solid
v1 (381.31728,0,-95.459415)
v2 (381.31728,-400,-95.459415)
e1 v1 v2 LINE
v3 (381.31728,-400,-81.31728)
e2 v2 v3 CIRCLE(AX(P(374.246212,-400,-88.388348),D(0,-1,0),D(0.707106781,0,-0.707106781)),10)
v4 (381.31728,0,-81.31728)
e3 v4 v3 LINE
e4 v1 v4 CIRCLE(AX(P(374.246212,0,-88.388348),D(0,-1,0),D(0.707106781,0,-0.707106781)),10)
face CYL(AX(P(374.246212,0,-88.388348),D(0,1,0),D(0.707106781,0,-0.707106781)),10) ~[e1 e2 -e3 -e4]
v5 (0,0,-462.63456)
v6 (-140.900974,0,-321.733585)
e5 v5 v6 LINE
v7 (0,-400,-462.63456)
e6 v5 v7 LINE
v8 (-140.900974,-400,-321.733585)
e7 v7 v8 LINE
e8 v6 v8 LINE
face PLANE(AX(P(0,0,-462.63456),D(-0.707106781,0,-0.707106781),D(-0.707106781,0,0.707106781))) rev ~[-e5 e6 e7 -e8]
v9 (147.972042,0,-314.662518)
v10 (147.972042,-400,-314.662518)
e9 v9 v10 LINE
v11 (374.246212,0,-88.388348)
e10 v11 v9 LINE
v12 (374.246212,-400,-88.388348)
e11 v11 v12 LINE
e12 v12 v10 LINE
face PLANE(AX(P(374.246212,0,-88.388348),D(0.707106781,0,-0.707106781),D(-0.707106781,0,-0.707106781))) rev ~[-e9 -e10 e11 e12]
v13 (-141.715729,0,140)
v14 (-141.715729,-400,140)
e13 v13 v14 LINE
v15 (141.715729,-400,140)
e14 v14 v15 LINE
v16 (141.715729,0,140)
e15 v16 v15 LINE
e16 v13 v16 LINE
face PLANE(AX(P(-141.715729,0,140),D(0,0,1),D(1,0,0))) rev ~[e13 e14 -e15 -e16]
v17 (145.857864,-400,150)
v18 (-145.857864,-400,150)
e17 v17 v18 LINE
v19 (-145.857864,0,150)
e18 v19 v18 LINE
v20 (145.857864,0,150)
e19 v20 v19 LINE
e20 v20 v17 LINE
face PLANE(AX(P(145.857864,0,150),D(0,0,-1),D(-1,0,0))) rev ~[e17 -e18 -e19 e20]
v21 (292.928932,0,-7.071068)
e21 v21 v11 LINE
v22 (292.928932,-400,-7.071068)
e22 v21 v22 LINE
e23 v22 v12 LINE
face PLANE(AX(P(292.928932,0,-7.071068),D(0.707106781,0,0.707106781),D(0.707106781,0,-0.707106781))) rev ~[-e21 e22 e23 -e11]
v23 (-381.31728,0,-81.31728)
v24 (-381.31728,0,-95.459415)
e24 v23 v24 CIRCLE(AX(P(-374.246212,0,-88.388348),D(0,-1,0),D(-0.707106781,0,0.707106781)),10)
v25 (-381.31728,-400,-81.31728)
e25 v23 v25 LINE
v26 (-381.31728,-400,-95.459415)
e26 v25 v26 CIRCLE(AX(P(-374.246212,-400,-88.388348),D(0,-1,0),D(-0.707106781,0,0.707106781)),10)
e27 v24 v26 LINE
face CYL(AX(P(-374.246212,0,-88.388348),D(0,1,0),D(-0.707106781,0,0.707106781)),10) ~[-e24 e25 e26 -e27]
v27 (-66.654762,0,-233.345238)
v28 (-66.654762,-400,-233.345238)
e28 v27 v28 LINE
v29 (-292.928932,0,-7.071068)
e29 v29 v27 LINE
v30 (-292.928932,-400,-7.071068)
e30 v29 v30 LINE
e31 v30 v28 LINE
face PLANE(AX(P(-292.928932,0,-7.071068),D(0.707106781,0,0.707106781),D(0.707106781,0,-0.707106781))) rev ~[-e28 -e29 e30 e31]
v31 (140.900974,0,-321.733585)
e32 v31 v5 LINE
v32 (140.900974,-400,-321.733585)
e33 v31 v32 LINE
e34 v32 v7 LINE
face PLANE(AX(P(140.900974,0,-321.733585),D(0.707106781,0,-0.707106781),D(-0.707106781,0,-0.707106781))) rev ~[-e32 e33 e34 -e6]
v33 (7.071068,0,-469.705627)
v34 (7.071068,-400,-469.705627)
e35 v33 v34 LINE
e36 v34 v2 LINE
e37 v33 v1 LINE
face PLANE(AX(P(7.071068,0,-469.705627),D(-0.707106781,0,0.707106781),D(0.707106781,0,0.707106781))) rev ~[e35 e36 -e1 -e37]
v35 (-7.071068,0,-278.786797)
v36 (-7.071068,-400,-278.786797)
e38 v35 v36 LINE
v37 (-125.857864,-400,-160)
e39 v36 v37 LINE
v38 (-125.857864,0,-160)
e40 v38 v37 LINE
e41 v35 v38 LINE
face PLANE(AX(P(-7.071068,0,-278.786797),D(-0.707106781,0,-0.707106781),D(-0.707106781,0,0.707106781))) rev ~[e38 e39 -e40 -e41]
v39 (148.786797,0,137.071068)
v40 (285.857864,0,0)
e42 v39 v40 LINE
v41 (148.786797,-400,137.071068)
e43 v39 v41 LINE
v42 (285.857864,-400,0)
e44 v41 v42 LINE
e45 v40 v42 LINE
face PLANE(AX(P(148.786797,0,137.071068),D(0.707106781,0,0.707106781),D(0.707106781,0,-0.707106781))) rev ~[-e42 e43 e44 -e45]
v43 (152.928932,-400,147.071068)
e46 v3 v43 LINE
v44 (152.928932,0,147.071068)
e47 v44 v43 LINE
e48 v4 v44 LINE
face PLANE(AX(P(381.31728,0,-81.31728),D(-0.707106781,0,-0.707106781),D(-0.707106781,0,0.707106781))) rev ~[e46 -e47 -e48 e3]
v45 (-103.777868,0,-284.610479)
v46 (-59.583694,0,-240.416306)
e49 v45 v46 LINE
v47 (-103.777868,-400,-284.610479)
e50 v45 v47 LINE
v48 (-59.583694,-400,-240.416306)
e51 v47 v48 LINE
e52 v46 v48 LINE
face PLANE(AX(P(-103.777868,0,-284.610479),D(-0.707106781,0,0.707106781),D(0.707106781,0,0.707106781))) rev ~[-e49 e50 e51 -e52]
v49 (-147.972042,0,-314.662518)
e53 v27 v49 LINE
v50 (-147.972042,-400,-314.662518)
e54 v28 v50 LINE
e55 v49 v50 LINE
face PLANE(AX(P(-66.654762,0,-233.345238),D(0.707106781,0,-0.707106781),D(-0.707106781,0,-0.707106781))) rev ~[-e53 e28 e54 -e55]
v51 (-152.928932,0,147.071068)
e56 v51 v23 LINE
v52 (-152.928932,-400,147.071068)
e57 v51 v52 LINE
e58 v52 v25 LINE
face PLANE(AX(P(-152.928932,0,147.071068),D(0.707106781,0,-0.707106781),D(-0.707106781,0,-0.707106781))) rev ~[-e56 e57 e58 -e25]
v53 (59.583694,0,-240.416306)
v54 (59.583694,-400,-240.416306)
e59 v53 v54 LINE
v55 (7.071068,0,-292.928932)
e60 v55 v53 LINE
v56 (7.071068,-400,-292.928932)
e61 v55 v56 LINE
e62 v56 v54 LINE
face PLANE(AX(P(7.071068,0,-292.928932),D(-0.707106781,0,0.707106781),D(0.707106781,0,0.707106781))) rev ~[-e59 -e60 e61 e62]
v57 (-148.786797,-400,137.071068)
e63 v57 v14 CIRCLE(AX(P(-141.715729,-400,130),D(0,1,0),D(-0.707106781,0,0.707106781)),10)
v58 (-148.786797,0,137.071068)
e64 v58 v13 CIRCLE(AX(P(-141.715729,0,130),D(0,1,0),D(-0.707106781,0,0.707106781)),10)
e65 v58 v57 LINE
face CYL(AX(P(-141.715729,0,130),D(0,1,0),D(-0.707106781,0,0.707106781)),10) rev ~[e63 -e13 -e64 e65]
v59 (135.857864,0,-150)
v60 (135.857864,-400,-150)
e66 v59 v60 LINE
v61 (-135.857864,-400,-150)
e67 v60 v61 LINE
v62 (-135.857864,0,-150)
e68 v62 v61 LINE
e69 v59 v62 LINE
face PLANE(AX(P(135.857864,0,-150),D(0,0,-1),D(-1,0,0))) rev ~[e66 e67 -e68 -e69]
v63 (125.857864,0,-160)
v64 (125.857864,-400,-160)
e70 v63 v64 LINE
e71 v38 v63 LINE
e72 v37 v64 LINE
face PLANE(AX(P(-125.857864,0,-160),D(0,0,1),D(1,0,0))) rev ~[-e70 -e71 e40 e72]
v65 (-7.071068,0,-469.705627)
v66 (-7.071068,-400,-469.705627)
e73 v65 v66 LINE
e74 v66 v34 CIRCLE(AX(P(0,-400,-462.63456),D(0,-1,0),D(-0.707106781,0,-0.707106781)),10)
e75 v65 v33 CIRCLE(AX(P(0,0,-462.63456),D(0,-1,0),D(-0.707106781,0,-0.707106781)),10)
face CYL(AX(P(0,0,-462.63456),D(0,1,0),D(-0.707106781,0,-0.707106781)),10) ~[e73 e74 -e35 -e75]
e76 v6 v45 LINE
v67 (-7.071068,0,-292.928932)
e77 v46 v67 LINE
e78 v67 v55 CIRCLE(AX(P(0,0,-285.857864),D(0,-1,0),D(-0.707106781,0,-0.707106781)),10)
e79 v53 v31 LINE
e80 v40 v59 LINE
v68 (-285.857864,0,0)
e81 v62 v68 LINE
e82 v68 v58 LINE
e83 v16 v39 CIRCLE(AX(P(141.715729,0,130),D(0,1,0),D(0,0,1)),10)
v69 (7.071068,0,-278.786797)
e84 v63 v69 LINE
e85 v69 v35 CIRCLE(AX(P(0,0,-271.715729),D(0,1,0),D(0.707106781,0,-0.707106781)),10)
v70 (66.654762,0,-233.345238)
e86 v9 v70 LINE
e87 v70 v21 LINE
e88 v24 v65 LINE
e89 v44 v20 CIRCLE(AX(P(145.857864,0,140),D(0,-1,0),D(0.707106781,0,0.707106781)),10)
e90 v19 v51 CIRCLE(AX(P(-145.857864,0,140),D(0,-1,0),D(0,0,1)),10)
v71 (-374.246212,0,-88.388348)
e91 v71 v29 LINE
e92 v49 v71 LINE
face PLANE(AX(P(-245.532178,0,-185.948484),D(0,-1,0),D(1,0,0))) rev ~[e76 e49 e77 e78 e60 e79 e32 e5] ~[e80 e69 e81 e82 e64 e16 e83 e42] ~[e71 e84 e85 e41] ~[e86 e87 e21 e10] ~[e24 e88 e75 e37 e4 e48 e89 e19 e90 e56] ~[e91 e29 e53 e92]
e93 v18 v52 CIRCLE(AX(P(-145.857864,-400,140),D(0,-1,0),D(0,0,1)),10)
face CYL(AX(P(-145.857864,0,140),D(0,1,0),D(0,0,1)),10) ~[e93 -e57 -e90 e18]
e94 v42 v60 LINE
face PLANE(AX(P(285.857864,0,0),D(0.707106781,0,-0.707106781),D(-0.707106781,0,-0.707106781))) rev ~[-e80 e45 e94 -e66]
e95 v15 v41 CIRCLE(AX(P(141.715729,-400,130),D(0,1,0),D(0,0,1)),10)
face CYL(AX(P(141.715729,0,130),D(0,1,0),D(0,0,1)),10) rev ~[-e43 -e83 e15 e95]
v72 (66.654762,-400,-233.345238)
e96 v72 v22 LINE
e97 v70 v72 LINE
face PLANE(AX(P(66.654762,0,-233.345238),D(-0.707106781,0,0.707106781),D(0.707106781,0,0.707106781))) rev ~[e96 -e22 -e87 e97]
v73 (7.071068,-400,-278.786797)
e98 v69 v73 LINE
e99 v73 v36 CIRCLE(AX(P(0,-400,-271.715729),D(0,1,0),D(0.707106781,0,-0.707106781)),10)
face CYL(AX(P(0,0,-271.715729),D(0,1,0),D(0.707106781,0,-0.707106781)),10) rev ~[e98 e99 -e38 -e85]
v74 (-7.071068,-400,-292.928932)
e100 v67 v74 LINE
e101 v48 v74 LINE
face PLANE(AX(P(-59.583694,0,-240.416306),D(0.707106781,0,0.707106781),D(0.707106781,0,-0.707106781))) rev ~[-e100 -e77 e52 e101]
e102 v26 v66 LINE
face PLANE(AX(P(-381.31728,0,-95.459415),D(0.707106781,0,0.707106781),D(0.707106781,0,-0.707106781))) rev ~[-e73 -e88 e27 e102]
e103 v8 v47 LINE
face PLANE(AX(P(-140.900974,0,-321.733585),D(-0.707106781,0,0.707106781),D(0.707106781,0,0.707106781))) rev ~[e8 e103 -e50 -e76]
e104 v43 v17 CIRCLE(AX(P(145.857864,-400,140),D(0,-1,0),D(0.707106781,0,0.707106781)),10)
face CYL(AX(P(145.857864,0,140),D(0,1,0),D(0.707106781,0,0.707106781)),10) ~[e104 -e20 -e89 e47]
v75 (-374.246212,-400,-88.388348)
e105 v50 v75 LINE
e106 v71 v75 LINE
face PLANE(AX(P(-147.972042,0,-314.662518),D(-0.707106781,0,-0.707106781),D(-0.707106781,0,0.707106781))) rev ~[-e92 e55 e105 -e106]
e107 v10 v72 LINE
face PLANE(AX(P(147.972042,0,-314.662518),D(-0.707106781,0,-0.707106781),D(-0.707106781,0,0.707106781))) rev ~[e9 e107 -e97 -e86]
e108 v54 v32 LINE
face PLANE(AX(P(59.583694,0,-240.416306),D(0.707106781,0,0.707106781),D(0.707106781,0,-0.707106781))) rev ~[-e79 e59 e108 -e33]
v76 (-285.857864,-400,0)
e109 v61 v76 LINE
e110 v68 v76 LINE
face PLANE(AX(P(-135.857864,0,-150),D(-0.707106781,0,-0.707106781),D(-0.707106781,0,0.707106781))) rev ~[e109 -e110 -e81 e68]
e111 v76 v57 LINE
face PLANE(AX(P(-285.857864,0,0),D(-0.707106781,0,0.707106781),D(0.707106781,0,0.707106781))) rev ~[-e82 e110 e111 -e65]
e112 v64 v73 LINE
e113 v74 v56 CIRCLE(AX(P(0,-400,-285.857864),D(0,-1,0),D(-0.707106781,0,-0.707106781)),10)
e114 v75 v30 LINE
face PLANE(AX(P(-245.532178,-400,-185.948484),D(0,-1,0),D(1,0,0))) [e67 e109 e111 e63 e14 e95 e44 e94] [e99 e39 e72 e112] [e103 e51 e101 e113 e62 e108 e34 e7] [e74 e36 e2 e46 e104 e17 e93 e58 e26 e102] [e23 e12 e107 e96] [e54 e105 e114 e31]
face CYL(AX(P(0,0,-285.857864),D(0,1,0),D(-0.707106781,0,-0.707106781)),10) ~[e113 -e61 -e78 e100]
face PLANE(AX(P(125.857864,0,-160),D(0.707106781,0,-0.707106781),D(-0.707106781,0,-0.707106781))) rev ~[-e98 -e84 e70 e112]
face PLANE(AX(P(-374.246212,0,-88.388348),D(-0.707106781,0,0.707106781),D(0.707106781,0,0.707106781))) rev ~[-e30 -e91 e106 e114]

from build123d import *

# Parameters (mm, degrees)
F1_DEPTH = 400


# Not quite as in the source:
# - a feature names something its author has since deleted; it is built from what else it names


with BuildPart() as f1:
    # F0 (on Front) → F1 (new body)
    with BuildSketch(Plane.XZ):
        with BuildLine():
            Line((-292.9289321881, -7.0710678119), (-300, 0))
            Line((-300, 0), (-381.3172798365, -81.3172798365))
            ThreePointArc((-381.3172798365, -81.3172798365), (-384.2462120246, -88.3883476483), (-381.3172798365, -95.4594154602))
            Line((-381.3172798365, -95.4594154602), (-155.0431098568, -321.7335854399))
            ThreePointArc((-155.0431098568, -321.7335854399), (-147.9720420449, -324.662517628), (-140.900974233, -321.7335854399))
            Line((-140.900974233, -321.7335854399), (-103.7778682207, -284.6104794276))
            Line((-103.7778682207, -284.6104794276), (-59.5836943966, -240.4163056034))
            Line((-59.5836943966, -240.4163056034), (-66.6547622084, -233.3452377916))
            Line((-66.6547622085, -233.3452377916), (-147.9720420449, -314.662517628))
            Line((-147.9720420449, -314.662517628), (-374.2462120246, -88.3883476483))
            Line((-374.2462120246, -88.3883476483), (-292.9289321882, -7.0710678119))
        make_face()
        with BuildLine():
            Line((-152.9289321881, 147.0710678119), (-300, 0))
            Line((-300, 0), (-292.9289321881, -7.0710678119))
            Line((-292.9289321881, -7.0710678119), (-150, -150))
            Line((-150, -150), (-66.6547622084, -233.3452377916))
            Line((-66.6547622084, -233.3452377916), (-59.5836943966, -240.4163056034))
            Line((-59.5836943966, -240.4163056034), (-7.0710678119, -292.9289321881))
            ThreePointArc((-7.0710678119, -292.9289321881), (0, -295.8578643763), (7.0710678119, -292.9289321881))
            Line((7.0710678119, -292.9289321881), (59.5836943966, -240.4163056034))
            Line((59.5836943966, -240.4163056034), (66.6547622084, -233.3452377916))
            Line((66.6547622084, -233.3452377916), (150, -150))
            Line((150, -150), (225.0000048894, -74.9999951106))
            Line((225.0000048894, -74.9999951106), (292.9289321881, -7.0710678119))
            Line((292.9289321881, -7.0710678119), (300, 0))
            Line((300, 0), (152.9289321881, 147.0710678119))
            ThreePointArc((152.9289321881, 147.0710678119), (149.6846986999, 149.2387953251), (145.8578643763, 150))
            Line((145.8578643763, 150), (-145.8578643763, 150))
            ThreePointArc((-145.8578643763, 150), (-149.6846986999, 149.2387953251), (-152.9289321881, 147.0710678119))
        make_face()
        with BuildLine():
            ThreePointArc((7.0710678119, -278.7867965644), (0, -281.7157287525), (-7.0710678119, -278.7867965644))
            Line((-7.0710678119, -278.7867965644), (-125.8578643763, -160))
            Line((-125.8578643763, -160), (-135.8578643763, -150))
            Line((-135.8578643763, -150), (-210.8578643763, -75))
            Line((-210.8578643763, -75), (-285.8578643763, 0))
            Line((-285.8578643763, 0), (-148.7867965644, 137.0710678118))
            ThreePointArc((-148.7867965644, 137.0710678118), (-145.5425630762, 139.2387953251), (-141.7157287526, 140))
            Line((-141.7157287526, 140), (141.7157287525, 140))
            ThreePointArc((141.7157287525, 140), (145.5425630762, 139.2387953251), (148.7867965644, 137.0710678119))
            Line((148.7867965644, 137.0710678119), (285.8578643762, 0))
            Line((285.8578643762, 0), (210.8578643762, -75))
            Line((210.8578643762, -75), (135.8578643762, -150))
            Line((135.8578643762, -150), (125.8578643762, -160))
            Line((125.8578643762, -160), (7.0710678119, -278.7867965644))
        make_face(mode=Mode.SUBTRACT)
        with BuildLine():
            ThreePointArc((-140.900974233, -321.7335854399), (-147.9720420449, -324.662517628), (-155.0431098568, -321.7335854399))
            Line((-155.0431098568, -321.7335854399), (-7.0710678119, -469.7056274848))
            ThreePointArc((-7.0710678119, -469.7056274848), (0, -472.6345596729), (7.0710678119, -469.7056274848))
            Line((7.0710678119, -469.7056274848), (155.0431098568, -321.7335854399))
            ThreePointArc((155.0431098568, -321.7335854399), (147.9720420449, -324.662517628), (140.900974233, -321.7335854399))
            Line((140.900974233, -321.7335854399), (0, -462.6345596729))
            Line((0, -462.6345596729), (-140.900974233, -321.7335854399))
        make_face()
        with BuildLine():
            Line((381.3172798364, -81.3172798364), (300, 0))
            Line((300, 0), (292.9289321881, -7.0710678119))
            Line((292.9289321881, -7.0710678118), (374.2462120246, -88.3883476483))
            Line((374.2462120246, -88.3883476483), (147.9720420449, -314.662517628))
            Line((147.9720420449, -314.662517628), (66.6547622084, -233.3452377915))
            Line((66.6547622084, -233.3452377916), (59.5836943966, -240.4163056034))
            Line((59.5836943966, -240.4163056034), (140.900974233, -321.7335854399))
            ThreePointArc((140.900974233, -321.7335854399), (147.9720420449, -324.662517628), (155.0431098568, -321.7335854399))
            Line((155.0431098568, -321.7335854399), (381.3172798364, -95.4594154602))
            ThreePointArc((381.3172798364, -95.4594154602), (384.2462120246, -88.3883476483), (381.3172798364, -81.3172798364))
        make_face()
        Polygon((-135.8578643763, -150), (-125.8578643763, -160), (125.8578643762, -160), (135.8578643762, -150), align=None)
    extrude(amount=F1_DEPTH)


solid = f1.part
